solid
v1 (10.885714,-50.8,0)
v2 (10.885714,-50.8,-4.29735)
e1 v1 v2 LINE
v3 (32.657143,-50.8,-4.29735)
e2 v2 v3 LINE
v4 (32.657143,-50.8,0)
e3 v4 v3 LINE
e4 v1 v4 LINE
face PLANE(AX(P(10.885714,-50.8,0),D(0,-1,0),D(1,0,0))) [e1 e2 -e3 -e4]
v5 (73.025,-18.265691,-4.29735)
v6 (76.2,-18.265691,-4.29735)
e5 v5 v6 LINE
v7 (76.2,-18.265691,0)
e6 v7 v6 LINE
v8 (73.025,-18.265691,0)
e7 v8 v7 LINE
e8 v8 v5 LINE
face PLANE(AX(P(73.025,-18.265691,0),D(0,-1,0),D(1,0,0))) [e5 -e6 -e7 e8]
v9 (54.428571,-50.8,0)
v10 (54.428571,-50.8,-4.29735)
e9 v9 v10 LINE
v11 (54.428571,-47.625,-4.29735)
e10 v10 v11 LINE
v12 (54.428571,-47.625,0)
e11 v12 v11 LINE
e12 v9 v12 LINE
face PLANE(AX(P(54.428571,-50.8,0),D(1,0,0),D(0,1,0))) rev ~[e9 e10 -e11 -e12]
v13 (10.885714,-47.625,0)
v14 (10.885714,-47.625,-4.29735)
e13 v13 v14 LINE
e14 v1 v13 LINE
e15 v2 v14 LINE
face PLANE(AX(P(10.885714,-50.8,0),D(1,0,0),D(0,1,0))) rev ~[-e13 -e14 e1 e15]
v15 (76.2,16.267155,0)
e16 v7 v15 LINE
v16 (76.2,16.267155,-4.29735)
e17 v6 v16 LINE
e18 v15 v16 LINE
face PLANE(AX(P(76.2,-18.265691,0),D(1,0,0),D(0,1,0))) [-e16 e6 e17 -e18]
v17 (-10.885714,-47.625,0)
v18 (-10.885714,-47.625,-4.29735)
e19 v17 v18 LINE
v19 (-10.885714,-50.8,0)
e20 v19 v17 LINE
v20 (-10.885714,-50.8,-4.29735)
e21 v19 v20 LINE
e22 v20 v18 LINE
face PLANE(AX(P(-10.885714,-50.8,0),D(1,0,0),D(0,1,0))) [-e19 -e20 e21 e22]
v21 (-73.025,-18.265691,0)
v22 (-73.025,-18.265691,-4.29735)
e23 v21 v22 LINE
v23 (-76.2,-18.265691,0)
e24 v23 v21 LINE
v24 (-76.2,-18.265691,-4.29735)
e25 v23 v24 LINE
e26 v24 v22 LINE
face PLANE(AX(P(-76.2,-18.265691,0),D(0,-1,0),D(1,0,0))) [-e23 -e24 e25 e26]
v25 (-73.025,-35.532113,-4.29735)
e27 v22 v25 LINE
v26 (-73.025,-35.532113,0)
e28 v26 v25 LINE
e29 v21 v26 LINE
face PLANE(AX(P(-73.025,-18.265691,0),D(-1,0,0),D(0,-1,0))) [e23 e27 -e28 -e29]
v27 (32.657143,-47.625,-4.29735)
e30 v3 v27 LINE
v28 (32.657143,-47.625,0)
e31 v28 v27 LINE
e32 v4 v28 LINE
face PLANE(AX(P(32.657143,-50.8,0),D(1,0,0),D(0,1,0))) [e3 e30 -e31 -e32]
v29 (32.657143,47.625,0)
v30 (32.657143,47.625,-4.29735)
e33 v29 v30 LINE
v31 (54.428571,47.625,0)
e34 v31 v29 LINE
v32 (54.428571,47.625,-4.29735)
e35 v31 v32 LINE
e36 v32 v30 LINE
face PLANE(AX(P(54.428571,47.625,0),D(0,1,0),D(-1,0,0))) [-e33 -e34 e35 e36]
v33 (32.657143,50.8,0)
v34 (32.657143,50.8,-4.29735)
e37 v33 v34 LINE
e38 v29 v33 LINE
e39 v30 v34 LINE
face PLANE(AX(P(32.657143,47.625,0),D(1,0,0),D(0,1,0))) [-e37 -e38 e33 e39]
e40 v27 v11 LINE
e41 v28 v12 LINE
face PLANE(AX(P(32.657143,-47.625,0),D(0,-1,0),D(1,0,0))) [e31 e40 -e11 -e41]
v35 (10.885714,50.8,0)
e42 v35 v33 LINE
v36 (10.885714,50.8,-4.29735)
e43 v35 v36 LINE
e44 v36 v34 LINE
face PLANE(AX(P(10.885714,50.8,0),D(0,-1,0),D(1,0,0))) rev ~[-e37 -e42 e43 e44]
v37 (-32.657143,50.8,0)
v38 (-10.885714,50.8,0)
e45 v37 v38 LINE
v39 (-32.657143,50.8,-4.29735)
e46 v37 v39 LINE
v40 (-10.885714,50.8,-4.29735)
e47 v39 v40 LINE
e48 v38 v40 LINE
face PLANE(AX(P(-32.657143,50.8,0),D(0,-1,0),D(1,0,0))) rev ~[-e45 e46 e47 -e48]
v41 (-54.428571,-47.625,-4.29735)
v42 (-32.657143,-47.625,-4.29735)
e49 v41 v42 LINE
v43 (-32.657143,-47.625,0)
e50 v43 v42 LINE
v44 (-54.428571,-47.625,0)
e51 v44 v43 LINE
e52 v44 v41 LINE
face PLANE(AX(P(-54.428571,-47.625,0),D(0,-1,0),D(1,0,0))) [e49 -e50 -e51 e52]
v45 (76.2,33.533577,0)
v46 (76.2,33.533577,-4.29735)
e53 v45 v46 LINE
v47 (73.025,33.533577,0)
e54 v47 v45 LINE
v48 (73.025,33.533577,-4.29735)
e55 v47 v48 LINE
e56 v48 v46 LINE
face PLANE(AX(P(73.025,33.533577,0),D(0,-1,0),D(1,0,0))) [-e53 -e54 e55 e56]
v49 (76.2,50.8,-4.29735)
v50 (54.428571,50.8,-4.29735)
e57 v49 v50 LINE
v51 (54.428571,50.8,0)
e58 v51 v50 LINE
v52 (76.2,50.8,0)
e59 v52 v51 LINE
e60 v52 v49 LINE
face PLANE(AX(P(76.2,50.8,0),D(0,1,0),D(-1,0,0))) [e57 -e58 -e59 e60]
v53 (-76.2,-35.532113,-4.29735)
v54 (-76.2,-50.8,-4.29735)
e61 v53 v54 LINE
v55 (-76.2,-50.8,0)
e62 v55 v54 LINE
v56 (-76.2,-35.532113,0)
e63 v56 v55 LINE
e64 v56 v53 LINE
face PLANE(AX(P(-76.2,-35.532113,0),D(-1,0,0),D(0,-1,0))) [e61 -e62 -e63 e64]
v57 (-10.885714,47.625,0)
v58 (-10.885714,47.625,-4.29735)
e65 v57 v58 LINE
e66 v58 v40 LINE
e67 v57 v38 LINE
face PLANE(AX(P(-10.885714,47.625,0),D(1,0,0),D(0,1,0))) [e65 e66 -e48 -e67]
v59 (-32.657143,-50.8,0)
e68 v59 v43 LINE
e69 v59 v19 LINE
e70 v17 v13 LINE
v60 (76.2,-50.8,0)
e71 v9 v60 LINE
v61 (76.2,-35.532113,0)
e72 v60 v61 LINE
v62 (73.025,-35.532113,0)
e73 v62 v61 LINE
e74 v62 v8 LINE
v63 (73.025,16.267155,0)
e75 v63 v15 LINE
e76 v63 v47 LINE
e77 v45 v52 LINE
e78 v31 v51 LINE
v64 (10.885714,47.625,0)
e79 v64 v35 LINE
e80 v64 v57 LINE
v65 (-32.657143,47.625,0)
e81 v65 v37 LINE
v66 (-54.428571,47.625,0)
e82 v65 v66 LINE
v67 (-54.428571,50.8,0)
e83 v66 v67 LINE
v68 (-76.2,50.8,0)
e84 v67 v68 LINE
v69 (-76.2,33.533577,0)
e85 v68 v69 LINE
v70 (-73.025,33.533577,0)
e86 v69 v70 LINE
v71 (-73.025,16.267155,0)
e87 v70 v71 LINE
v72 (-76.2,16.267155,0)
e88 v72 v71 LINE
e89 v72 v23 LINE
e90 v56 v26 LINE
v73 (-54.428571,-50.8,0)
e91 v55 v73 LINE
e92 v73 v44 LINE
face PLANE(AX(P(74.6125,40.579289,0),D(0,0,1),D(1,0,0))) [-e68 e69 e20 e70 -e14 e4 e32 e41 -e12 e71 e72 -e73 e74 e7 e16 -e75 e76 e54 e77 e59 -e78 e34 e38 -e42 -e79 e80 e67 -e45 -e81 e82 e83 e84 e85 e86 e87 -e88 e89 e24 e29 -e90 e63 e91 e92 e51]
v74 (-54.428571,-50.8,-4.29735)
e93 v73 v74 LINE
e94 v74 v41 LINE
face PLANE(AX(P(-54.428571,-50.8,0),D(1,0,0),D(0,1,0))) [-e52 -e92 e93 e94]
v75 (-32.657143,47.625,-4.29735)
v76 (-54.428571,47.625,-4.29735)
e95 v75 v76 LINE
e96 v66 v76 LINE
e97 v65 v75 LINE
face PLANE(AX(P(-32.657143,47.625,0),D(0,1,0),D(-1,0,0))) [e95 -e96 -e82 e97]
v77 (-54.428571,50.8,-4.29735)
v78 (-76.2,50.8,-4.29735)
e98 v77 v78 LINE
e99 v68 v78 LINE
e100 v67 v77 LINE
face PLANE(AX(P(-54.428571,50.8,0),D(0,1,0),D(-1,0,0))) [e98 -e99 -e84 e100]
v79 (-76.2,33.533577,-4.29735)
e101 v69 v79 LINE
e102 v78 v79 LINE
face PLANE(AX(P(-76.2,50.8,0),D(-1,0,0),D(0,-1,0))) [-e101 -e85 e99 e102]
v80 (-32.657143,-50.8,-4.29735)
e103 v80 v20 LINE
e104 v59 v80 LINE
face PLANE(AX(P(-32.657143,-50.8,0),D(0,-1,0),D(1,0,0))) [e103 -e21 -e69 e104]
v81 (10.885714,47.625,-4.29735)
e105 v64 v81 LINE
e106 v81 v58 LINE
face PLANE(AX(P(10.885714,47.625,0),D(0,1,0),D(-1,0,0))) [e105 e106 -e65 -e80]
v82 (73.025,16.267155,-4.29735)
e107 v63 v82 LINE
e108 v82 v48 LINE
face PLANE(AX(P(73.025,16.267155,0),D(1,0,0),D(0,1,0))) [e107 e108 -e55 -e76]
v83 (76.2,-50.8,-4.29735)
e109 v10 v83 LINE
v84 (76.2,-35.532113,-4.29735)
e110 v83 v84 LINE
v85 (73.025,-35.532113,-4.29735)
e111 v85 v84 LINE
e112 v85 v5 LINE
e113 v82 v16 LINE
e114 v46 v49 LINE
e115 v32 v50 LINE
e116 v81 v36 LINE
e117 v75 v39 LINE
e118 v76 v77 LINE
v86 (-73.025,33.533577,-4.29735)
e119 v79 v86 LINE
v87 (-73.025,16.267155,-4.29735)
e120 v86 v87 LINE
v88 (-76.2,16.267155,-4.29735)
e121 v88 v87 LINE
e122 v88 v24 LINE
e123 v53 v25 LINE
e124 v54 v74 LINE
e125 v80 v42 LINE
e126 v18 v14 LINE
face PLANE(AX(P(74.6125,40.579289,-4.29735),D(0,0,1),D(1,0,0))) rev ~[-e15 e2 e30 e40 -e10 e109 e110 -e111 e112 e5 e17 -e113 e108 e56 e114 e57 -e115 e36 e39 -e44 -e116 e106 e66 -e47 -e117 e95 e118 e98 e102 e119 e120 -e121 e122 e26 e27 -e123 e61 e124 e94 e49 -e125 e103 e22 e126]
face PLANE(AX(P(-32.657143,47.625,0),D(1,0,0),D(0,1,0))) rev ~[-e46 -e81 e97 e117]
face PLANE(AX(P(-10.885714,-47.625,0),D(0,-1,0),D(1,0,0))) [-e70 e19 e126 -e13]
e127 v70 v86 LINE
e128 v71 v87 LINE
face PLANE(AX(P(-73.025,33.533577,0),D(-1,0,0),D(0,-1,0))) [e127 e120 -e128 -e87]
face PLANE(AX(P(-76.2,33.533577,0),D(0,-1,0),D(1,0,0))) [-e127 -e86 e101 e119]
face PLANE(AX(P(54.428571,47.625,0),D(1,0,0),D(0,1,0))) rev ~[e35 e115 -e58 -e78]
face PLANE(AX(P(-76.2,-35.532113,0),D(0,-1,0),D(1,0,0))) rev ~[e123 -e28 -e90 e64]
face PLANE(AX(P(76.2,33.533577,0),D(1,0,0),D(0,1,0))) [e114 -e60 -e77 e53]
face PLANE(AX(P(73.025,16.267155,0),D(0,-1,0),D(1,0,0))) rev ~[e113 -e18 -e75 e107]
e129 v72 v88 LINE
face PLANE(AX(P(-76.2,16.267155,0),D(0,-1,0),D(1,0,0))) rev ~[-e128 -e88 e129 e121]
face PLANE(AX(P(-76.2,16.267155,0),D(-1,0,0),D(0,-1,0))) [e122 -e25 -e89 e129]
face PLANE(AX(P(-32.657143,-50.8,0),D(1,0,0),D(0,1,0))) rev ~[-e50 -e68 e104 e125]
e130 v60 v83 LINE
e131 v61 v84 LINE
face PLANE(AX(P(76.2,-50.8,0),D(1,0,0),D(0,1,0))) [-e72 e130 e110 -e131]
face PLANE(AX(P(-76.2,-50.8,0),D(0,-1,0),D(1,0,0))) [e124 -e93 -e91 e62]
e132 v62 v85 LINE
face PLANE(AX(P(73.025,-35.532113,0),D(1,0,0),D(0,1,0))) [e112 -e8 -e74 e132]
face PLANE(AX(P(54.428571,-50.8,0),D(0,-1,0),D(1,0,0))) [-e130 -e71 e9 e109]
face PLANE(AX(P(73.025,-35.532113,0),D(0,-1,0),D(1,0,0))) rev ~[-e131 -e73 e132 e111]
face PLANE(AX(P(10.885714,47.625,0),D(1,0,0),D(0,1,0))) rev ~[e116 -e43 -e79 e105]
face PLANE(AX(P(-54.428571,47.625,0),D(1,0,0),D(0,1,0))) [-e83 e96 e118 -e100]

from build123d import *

# Parameters (mm, degrees)
F0_W     = 3.175
F0_H     = 14.0914226329
F0_H_2   = 17.2664226329
F0_H_3   = 12.0928868353
F0_W_2   = 18.5964285714
F0_H_4   = 3.175
F0_W_3   = 21.7714285714
F1_DEPTH = 4.29735


with BuildPart() as f1:
    # F0 (on Top) → F1 (new body)
    with BuildSketch(Plane.XY):
        with Locations((74.6125, 40.5792886835)):
            Rectangle(F0_W, F0_H)
        with Locations((74.6125, 7.6339434177)):
            Rectangle(F0_W, F0_H_2)
        with Locations((74.6125, -9.6324792153)):
            Rectangle(F0_W, F0_H_2)
        with Locations((74.6125, -41.5785565823)):
            Rectangle(F0_W, F0_H_3)
        with Locations((63.7267857143, -49.2125)):
            Rectangle(F0_W_2, F0_H_4)
        with Locations((21.7714285714, -49.2125)):
            Rectangle(F0_W_3, F0_H_4)
        with Locations((-21.7714285714, -49.2125)):
            Rectangle(F0_W_3, F0_H_4)
        with Locations((-63.7267857143, -49.2125)):
            Rectangle(F0_W_2, F0_H_4)
        with Locations((-74.6125, -41.5785565823)):
            Rectangle(F0_W, F0_H_3)
        with Locations((-74.6125, -9.6324792153)):
            Rectangle(F0_W, F0_H_2)
        with Locations((-74.6125, 7.6339434177)):
            Rectangle(F0_W, F0_H_2)
        with Locations((-74.6125, 40.5792886835)):
            Rectangle(F0_W, F0_H)
        with Locations((-63.7267857143, 49.2125)):
            Rectangle(F0_W_2, F0_H_4)
        with Locations((-21.7714285714, 49.2125)):
            Rectangle(F0_W_3, F0_H_4)
        with Locations((21.7714285714, 49.2125)):
            Rectangle(F0_W_3, F0_H_4)
        with Locations((63.7267857143, 49.2125)):
            Rectangle(F0_W_2, F0_H_4)
        Polygon((54.4285714286, -47.625), (73.025, -47.625), (73.025, -35.5321131647), (73.025, -18.2656905317), (73.025, -0.9992678988), (73.025, 16.2671547341), (73.025, 33.5335773671), (73.025, 47.625), (54.4285714286, 47.625), (32.6571428571, 47.625), (10.8857142857, 47.625), (-10.8857142857, 47.625), (-32.6571428571, 47.625), (-54.4285714286, 47.625), (-73.025, 47.625), (-73.025, 33.5335773671), (-73.025, 16.2671547341), (-73.025, -0.9992678988), (-73.025, -18.2656905317), (-73.025, -35.5321131647), (-73.025, -47.625), (-54.4285714286, -47.625), (-32.6571428571, -47.625), (-10.8857142857, -47.625), (10.8857142857, -47.625), (32.6571428571, -47.625), align=None)
        with Locations((74.6125, 49.2125)):
            Rectangle(F0_W, F0_H_4)
        with Locations((74.6125, -49.2125)):
            Rectangle(F0_W, F0_H_4)
        with Locations((-74.6125, -49.2125)):
            Rectangle(F0_W, F0_H_4)
        with Locations((-74.6125, 49.2125)):
            Rectangle(F0_W, F0_H_4)
    extrude(amount=-F1_DEPTH)


solid = f1.part
